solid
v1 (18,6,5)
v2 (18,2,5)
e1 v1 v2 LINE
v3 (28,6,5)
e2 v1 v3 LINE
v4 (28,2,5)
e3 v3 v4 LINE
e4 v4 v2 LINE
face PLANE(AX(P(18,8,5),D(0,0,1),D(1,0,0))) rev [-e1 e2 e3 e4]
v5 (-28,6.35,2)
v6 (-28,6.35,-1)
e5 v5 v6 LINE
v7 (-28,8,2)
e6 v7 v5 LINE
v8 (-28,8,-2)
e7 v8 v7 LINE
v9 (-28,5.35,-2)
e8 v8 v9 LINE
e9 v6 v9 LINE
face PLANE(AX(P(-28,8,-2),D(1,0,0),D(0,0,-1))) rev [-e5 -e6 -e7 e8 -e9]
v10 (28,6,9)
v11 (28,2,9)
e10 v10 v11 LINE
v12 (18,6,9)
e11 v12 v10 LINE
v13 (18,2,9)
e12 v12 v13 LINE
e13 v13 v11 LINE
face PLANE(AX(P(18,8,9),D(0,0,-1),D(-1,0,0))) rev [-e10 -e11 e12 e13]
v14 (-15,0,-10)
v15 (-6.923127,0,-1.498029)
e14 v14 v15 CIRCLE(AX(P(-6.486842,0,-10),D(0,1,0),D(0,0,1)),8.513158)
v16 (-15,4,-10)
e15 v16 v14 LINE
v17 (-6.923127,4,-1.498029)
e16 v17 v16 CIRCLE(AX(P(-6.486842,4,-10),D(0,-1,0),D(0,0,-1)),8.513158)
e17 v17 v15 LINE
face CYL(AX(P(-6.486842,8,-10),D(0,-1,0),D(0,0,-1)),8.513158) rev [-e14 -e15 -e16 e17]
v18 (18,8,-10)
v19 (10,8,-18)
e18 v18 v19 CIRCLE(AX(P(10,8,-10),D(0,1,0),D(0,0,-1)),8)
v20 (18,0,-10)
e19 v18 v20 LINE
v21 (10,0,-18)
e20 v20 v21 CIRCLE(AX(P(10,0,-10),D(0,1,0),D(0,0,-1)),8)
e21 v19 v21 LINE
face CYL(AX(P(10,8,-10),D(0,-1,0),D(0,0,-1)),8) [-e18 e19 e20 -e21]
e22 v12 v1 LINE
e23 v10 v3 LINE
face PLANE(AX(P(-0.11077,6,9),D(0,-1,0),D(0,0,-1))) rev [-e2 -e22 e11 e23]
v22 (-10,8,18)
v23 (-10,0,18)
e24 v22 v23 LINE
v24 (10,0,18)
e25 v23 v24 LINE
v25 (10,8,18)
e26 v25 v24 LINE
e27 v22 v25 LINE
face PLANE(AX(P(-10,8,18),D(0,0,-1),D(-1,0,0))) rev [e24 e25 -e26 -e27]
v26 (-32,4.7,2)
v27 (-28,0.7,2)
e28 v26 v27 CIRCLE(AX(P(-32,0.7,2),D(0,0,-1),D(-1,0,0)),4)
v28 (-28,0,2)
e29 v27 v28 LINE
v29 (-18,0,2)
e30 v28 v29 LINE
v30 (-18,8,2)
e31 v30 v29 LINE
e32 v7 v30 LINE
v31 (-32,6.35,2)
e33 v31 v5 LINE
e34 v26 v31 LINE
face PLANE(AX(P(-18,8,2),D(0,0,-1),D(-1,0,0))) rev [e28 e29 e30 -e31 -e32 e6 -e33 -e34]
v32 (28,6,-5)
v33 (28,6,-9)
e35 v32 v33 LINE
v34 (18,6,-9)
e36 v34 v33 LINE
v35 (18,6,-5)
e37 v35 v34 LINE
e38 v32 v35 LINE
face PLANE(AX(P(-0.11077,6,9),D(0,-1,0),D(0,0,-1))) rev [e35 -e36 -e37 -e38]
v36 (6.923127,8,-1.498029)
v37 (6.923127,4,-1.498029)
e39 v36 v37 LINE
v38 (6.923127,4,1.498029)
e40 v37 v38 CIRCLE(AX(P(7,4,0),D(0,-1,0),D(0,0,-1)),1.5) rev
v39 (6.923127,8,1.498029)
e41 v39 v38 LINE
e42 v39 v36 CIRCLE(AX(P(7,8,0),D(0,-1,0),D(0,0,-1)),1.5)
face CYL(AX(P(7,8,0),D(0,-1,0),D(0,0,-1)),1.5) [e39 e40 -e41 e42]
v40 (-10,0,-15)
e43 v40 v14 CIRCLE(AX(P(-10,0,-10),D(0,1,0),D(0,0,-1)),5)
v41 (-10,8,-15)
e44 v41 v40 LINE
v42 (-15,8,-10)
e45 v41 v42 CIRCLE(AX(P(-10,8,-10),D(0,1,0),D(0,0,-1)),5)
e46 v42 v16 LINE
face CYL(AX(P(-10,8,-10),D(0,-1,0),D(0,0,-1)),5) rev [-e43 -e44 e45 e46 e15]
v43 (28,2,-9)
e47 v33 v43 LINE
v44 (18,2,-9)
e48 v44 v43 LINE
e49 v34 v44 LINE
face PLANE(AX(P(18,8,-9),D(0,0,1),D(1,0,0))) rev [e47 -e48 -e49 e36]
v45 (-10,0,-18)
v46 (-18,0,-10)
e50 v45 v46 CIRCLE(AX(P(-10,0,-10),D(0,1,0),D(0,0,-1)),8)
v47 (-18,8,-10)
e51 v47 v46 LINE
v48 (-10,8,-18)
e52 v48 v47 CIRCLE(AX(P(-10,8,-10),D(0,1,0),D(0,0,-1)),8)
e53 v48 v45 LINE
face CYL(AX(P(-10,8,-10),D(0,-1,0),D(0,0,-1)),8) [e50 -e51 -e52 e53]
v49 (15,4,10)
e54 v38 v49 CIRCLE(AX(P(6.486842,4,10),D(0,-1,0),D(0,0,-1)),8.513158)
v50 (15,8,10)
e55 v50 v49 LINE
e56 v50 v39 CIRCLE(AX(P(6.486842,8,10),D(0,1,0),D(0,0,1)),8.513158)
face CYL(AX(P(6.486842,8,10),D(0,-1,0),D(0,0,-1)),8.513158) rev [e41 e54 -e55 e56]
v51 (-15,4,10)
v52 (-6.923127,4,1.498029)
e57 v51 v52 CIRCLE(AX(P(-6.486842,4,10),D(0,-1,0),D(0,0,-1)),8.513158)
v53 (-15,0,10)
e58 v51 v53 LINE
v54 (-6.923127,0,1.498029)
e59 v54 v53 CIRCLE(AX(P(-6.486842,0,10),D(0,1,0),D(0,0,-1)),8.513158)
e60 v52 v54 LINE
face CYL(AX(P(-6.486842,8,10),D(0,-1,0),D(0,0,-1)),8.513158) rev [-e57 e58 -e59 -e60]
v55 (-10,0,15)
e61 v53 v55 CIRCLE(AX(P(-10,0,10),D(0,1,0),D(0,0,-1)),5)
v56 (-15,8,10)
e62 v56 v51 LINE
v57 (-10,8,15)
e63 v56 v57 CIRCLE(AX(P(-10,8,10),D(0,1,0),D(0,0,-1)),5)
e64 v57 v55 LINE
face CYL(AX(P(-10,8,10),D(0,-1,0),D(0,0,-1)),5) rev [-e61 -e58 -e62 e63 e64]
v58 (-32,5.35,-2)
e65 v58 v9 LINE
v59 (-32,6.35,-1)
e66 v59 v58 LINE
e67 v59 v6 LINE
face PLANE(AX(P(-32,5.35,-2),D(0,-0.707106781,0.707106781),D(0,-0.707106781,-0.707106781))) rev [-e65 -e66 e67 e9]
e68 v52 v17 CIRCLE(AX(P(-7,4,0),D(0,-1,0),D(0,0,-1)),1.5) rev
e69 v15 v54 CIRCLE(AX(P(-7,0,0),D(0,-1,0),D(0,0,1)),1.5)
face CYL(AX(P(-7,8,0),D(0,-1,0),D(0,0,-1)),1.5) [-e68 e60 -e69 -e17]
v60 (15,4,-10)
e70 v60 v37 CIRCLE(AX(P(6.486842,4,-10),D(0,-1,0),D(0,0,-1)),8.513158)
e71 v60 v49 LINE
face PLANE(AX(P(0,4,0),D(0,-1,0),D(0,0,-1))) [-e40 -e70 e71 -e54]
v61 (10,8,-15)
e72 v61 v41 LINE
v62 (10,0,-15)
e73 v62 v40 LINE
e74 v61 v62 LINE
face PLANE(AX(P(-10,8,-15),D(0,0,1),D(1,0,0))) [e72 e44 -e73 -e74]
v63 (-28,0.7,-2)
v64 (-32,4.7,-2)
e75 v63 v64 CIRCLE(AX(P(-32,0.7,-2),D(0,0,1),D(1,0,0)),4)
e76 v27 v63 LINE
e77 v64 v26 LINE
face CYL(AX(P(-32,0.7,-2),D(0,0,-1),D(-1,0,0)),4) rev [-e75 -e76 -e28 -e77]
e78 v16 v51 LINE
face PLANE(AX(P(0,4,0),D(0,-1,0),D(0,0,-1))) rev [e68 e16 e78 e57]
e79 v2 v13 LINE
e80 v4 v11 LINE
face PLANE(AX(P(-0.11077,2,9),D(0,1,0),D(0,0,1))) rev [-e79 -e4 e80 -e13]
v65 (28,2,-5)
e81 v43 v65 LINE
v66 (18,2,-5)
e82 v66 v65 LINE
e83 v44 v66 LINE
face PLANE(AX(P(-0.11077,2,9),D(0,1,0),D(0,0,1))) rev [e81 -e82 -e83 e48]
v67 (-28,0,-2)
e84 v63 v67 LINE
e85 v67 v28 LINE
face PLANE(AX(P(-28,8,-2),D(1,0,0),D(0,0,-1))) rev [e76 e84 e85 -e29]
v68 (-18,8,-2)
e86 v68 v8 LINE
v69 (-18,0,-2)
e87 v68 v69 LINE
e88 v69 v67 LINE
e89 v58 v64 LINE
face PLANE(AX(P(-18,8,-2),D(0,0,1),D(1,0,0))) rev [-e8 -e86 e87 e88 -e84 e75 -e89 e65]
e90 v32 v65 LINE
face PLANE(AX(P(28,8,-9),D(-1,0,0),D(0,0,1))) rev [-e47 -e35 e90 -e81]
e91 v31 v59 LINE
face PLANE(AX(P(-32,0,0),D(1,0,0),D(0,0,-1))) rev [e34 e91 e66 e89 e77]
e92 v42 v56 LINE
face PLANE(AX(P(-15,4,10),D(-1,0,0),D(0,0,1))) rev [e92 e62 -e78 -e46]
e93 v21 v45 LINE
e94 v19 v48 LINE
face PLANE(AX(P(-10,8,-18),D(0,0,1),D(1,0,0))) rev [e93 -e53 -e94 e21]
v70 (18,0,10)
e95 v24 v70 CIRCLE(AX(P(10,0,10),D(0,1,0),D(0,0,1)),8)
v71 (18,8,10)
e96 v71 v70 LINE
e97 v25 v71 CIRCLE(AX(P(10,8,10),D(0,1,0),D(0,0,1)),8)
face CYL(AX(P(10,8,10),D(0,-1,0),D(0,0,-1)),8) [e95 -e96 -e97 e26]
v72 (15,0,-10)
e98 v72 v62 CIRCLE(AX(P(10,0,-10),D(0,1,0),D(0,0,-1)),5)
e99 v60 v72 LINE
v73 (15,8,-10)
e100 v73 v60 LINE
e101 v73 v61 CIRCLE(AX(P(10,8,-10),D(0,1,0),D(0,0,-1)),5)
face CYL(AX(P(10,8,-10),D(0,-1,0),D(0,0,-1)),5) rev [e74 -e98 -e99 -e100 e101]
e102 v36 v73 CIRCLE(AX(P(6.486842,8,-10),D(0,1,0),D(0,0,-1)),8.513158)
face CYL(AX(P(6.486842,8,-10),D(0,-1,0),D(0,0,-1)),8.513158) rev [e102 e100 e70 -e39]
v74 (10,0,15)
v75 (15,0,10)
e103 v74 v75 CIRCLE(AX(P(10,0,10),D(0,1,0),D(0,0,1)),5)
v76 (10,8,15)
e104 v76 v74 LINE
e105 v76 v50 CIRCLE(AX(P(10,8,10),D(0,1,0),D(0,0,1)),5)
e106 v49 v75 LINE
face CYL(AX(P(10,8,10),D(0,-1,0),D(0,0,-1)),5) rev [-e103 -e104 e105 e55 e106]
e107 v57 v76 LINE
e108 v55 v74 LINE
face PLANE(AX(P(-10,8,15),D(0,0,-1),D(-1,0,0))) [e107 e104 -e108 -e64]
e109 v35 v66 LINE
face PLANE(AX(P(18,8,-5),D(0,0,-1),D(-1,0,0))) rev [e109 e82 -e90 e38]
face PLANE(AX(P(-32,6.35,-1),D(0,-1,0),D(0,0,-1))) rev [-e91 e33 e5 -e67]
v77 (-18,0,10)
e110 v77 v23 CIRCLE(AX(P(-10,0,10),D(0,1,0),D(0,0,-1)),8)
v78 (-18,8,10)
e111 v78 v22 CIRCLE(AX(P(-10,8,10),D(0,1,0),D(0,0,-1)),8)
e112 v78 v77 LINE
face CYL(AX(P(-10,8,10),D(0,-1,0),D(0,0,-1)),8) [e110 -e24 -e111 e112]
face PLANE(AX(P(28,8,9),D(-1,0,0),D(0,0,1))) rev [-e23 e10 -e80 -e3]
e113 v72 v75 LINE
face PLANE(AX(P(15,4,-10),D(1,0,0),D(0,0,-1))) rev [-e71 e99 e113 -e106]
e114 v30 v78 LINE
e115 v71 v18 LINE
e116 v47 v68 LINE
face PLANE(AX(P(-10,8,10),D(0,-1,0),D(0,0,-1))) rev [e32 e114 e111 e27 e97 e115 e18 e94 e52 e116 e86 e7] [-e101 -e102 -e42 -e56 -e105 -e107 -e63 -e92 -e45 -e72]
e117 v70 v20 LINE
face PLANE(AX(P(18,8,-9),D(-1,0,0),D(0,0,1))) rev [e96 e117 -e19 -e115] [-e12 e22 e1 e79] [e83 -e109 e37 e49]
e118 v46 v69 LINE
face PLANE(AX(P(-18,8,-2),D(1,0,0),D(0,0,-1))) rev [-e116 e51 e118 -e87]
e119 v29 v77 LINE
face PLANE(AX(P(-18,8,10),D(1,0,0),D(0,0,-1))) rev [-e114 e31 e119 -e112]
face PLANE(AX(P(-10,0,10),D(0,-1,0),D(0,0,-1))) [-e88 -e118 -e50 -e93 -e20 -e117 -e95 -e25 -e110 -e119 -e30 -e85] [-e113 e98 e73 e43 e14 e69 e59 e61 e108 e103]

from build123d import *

# Parameters (mm, degrees)
BOSS_EXTRUDE1_DEPTH = 8
BOSS_EXTRUDE2_DEPTH = 4
SKETCH3_W           = 18
SKETCH3_H           = 2
CUT_EXTRUDE1_DEPTH  = 10
FILLET1_R           = 4
SKETCH4_W           = 9.5
SKETCH4_H           = 20
CUT_EXTRUDE2_DEPTH  = 4
SKETCH5_W           = 9.5
SKETCH5_H           = 20
CUT_EXTRUDE3_DEPTH  = 4


with BuildPart() as part:
    # Sketch1 → Boss-Extrude1 (new body)
    with BuildSketch(Plane(origin=(0, 0, 0), x_dir=(1, 0, 0), z_dir=(0, 1, 0))):
        with BuildLine():
            Line((-18, -10), (-18, -2))
            Line((-18, -2), (-28, -2))
            Line((-28, -2), (-28, 2))
            Line((-28, 2), (-18, 2))
            Line((-18, 2), (-18, 10))
            ThreePointArc((-18, 10), (-15.656854249, 15.656854249), (-10, 18))
            Line((-10, 18), (10, 18))
            ThreePointArc((10, 18), (15.656854249, 15.656854249), (18, 10))
            Line((18, 10), (18, 9))
            Line((18, 9), (28, 9))
            Line((28, 9), (28, 5))
            Line((28, 5), (18, 5))
            Line((18, 5), (18, -5))
            Line((18, -5), (28, -5))
            Line((28, -5), (28, -9))
            Line((28, -9), (18, -9))
            Line((18, -9), (18, -10))
            ThreePointArc((18, -10), (15.656854249, -15.656854249), (10, -18))
            Line((10, -18), (-10, -18))
            ThreePointArc((-10, -18), (-15.656854249, -15.656854249), (-18, -10))
        make_face()
        with BuildLine():
            Line((-10, -15), (10, -15))
            ThreePointArc((10, -15), (13.535533906, -13.535533906), (15, -10))
            ThreePointArc((15, -10), (12.658876757, -4.136567081), (6.923127464, -1.498028909))
            ThreePointArc((6.923127464, -1.498028909), (5.5, 0), (6.923127464, 1.498028909))
            ThreePointArc((6.923127464, 1.498028909), (12.658876757, 4.136567081), (15, 10))
            ThreePointArc((15, 10), (13.535533906, 13.535533906), (10, 15))
            Line((10, 15), (-10, 15))
            ThreePointArc((-10, 15), (-13.535533906, 13.535533906), (-15, 10))
            ThreePointArc((-15, 10), (-12.658876757, 4.136567081), (-6.923127464, 1.498028909))
            ThreePointArc((-6.923127464, 1.498028909), (-5.5, 0), (-6.923127464, -1.498028909))
            ThreePointArc((-6.923127464, -1.498028909), (-12.658876757, -4.136567081), (-15, -10))
            ThreePointArc((-15, -10), (-13.535533906, -13.535533906), (-10, -15))
        make_face(mode=Mode.SUBTRACT)
    extrude(amount=BOSS_EXTRUDE1_DEPTH)

    # Sketch2 → Boss-Extrude2 (add)
    with BuildSketch(Plane.ZY.offset(28)):
        Polygon((-1, 6.35), (2, 6.35), (2, 4.7), (-2, 4.7), (-2, 5.35), align=None)
    extrude(amount=BOSS_EXTRUDE2_DEPTH)

    # Sketch3 → Cut-Extrude1 (cut)
    with BuildSketch(Plane(origin=(28, 0, 0), x_dir=(0, 0, -1), z_dir=(1, 0, 0))):
        with Locations((0, 1)):
            Rectangle(SKETCH3_W, SKETCH3_H)
        with Locations((0, 7)):
            Rectangle(SKETCH3_W, SKETCH3_H)
    extrude(amount=-CUT_EXTRUDE1_DEPTH, mode=Mode.SUBTRACT)

    # Fillet1
    fillet1_edges = [part.edges().sort_by_distance(p)[0] for p in [
        (-28, 4.7, 0),
    ]]
    fillet(fillet1_edges, radius=FILLET1_R - 0.0001)  # a hair under: the kernel refuses the full size

    # Sketch4 → Cut-Extrude2 (cut)
    with BuildSketch(Plane.XZ):
        with Locations((10.25, 0)):
            Rectangle(SKETCH4_W, SKETCH4_H)
    extrude(amount=-CUT_EXTRUDE2_DEPTH, mode=Mode.SUBTRACT)

    # Sketch5 → Cut-Extrude3 (cut)
    with BuildSketch(Plane(origin=(0, 8, 0), x_dir=(1, 0, 0), z_dir=(0, 1, 0))):
        with Locations((-10.25, 0)):
            Rectangle(SKETCH5_W, SKETCH5_H)
    extrude(amount=-CUT_EXTRUDE3_DEPTH, mode=Mode.SUBTRACT)


solid = part.part
